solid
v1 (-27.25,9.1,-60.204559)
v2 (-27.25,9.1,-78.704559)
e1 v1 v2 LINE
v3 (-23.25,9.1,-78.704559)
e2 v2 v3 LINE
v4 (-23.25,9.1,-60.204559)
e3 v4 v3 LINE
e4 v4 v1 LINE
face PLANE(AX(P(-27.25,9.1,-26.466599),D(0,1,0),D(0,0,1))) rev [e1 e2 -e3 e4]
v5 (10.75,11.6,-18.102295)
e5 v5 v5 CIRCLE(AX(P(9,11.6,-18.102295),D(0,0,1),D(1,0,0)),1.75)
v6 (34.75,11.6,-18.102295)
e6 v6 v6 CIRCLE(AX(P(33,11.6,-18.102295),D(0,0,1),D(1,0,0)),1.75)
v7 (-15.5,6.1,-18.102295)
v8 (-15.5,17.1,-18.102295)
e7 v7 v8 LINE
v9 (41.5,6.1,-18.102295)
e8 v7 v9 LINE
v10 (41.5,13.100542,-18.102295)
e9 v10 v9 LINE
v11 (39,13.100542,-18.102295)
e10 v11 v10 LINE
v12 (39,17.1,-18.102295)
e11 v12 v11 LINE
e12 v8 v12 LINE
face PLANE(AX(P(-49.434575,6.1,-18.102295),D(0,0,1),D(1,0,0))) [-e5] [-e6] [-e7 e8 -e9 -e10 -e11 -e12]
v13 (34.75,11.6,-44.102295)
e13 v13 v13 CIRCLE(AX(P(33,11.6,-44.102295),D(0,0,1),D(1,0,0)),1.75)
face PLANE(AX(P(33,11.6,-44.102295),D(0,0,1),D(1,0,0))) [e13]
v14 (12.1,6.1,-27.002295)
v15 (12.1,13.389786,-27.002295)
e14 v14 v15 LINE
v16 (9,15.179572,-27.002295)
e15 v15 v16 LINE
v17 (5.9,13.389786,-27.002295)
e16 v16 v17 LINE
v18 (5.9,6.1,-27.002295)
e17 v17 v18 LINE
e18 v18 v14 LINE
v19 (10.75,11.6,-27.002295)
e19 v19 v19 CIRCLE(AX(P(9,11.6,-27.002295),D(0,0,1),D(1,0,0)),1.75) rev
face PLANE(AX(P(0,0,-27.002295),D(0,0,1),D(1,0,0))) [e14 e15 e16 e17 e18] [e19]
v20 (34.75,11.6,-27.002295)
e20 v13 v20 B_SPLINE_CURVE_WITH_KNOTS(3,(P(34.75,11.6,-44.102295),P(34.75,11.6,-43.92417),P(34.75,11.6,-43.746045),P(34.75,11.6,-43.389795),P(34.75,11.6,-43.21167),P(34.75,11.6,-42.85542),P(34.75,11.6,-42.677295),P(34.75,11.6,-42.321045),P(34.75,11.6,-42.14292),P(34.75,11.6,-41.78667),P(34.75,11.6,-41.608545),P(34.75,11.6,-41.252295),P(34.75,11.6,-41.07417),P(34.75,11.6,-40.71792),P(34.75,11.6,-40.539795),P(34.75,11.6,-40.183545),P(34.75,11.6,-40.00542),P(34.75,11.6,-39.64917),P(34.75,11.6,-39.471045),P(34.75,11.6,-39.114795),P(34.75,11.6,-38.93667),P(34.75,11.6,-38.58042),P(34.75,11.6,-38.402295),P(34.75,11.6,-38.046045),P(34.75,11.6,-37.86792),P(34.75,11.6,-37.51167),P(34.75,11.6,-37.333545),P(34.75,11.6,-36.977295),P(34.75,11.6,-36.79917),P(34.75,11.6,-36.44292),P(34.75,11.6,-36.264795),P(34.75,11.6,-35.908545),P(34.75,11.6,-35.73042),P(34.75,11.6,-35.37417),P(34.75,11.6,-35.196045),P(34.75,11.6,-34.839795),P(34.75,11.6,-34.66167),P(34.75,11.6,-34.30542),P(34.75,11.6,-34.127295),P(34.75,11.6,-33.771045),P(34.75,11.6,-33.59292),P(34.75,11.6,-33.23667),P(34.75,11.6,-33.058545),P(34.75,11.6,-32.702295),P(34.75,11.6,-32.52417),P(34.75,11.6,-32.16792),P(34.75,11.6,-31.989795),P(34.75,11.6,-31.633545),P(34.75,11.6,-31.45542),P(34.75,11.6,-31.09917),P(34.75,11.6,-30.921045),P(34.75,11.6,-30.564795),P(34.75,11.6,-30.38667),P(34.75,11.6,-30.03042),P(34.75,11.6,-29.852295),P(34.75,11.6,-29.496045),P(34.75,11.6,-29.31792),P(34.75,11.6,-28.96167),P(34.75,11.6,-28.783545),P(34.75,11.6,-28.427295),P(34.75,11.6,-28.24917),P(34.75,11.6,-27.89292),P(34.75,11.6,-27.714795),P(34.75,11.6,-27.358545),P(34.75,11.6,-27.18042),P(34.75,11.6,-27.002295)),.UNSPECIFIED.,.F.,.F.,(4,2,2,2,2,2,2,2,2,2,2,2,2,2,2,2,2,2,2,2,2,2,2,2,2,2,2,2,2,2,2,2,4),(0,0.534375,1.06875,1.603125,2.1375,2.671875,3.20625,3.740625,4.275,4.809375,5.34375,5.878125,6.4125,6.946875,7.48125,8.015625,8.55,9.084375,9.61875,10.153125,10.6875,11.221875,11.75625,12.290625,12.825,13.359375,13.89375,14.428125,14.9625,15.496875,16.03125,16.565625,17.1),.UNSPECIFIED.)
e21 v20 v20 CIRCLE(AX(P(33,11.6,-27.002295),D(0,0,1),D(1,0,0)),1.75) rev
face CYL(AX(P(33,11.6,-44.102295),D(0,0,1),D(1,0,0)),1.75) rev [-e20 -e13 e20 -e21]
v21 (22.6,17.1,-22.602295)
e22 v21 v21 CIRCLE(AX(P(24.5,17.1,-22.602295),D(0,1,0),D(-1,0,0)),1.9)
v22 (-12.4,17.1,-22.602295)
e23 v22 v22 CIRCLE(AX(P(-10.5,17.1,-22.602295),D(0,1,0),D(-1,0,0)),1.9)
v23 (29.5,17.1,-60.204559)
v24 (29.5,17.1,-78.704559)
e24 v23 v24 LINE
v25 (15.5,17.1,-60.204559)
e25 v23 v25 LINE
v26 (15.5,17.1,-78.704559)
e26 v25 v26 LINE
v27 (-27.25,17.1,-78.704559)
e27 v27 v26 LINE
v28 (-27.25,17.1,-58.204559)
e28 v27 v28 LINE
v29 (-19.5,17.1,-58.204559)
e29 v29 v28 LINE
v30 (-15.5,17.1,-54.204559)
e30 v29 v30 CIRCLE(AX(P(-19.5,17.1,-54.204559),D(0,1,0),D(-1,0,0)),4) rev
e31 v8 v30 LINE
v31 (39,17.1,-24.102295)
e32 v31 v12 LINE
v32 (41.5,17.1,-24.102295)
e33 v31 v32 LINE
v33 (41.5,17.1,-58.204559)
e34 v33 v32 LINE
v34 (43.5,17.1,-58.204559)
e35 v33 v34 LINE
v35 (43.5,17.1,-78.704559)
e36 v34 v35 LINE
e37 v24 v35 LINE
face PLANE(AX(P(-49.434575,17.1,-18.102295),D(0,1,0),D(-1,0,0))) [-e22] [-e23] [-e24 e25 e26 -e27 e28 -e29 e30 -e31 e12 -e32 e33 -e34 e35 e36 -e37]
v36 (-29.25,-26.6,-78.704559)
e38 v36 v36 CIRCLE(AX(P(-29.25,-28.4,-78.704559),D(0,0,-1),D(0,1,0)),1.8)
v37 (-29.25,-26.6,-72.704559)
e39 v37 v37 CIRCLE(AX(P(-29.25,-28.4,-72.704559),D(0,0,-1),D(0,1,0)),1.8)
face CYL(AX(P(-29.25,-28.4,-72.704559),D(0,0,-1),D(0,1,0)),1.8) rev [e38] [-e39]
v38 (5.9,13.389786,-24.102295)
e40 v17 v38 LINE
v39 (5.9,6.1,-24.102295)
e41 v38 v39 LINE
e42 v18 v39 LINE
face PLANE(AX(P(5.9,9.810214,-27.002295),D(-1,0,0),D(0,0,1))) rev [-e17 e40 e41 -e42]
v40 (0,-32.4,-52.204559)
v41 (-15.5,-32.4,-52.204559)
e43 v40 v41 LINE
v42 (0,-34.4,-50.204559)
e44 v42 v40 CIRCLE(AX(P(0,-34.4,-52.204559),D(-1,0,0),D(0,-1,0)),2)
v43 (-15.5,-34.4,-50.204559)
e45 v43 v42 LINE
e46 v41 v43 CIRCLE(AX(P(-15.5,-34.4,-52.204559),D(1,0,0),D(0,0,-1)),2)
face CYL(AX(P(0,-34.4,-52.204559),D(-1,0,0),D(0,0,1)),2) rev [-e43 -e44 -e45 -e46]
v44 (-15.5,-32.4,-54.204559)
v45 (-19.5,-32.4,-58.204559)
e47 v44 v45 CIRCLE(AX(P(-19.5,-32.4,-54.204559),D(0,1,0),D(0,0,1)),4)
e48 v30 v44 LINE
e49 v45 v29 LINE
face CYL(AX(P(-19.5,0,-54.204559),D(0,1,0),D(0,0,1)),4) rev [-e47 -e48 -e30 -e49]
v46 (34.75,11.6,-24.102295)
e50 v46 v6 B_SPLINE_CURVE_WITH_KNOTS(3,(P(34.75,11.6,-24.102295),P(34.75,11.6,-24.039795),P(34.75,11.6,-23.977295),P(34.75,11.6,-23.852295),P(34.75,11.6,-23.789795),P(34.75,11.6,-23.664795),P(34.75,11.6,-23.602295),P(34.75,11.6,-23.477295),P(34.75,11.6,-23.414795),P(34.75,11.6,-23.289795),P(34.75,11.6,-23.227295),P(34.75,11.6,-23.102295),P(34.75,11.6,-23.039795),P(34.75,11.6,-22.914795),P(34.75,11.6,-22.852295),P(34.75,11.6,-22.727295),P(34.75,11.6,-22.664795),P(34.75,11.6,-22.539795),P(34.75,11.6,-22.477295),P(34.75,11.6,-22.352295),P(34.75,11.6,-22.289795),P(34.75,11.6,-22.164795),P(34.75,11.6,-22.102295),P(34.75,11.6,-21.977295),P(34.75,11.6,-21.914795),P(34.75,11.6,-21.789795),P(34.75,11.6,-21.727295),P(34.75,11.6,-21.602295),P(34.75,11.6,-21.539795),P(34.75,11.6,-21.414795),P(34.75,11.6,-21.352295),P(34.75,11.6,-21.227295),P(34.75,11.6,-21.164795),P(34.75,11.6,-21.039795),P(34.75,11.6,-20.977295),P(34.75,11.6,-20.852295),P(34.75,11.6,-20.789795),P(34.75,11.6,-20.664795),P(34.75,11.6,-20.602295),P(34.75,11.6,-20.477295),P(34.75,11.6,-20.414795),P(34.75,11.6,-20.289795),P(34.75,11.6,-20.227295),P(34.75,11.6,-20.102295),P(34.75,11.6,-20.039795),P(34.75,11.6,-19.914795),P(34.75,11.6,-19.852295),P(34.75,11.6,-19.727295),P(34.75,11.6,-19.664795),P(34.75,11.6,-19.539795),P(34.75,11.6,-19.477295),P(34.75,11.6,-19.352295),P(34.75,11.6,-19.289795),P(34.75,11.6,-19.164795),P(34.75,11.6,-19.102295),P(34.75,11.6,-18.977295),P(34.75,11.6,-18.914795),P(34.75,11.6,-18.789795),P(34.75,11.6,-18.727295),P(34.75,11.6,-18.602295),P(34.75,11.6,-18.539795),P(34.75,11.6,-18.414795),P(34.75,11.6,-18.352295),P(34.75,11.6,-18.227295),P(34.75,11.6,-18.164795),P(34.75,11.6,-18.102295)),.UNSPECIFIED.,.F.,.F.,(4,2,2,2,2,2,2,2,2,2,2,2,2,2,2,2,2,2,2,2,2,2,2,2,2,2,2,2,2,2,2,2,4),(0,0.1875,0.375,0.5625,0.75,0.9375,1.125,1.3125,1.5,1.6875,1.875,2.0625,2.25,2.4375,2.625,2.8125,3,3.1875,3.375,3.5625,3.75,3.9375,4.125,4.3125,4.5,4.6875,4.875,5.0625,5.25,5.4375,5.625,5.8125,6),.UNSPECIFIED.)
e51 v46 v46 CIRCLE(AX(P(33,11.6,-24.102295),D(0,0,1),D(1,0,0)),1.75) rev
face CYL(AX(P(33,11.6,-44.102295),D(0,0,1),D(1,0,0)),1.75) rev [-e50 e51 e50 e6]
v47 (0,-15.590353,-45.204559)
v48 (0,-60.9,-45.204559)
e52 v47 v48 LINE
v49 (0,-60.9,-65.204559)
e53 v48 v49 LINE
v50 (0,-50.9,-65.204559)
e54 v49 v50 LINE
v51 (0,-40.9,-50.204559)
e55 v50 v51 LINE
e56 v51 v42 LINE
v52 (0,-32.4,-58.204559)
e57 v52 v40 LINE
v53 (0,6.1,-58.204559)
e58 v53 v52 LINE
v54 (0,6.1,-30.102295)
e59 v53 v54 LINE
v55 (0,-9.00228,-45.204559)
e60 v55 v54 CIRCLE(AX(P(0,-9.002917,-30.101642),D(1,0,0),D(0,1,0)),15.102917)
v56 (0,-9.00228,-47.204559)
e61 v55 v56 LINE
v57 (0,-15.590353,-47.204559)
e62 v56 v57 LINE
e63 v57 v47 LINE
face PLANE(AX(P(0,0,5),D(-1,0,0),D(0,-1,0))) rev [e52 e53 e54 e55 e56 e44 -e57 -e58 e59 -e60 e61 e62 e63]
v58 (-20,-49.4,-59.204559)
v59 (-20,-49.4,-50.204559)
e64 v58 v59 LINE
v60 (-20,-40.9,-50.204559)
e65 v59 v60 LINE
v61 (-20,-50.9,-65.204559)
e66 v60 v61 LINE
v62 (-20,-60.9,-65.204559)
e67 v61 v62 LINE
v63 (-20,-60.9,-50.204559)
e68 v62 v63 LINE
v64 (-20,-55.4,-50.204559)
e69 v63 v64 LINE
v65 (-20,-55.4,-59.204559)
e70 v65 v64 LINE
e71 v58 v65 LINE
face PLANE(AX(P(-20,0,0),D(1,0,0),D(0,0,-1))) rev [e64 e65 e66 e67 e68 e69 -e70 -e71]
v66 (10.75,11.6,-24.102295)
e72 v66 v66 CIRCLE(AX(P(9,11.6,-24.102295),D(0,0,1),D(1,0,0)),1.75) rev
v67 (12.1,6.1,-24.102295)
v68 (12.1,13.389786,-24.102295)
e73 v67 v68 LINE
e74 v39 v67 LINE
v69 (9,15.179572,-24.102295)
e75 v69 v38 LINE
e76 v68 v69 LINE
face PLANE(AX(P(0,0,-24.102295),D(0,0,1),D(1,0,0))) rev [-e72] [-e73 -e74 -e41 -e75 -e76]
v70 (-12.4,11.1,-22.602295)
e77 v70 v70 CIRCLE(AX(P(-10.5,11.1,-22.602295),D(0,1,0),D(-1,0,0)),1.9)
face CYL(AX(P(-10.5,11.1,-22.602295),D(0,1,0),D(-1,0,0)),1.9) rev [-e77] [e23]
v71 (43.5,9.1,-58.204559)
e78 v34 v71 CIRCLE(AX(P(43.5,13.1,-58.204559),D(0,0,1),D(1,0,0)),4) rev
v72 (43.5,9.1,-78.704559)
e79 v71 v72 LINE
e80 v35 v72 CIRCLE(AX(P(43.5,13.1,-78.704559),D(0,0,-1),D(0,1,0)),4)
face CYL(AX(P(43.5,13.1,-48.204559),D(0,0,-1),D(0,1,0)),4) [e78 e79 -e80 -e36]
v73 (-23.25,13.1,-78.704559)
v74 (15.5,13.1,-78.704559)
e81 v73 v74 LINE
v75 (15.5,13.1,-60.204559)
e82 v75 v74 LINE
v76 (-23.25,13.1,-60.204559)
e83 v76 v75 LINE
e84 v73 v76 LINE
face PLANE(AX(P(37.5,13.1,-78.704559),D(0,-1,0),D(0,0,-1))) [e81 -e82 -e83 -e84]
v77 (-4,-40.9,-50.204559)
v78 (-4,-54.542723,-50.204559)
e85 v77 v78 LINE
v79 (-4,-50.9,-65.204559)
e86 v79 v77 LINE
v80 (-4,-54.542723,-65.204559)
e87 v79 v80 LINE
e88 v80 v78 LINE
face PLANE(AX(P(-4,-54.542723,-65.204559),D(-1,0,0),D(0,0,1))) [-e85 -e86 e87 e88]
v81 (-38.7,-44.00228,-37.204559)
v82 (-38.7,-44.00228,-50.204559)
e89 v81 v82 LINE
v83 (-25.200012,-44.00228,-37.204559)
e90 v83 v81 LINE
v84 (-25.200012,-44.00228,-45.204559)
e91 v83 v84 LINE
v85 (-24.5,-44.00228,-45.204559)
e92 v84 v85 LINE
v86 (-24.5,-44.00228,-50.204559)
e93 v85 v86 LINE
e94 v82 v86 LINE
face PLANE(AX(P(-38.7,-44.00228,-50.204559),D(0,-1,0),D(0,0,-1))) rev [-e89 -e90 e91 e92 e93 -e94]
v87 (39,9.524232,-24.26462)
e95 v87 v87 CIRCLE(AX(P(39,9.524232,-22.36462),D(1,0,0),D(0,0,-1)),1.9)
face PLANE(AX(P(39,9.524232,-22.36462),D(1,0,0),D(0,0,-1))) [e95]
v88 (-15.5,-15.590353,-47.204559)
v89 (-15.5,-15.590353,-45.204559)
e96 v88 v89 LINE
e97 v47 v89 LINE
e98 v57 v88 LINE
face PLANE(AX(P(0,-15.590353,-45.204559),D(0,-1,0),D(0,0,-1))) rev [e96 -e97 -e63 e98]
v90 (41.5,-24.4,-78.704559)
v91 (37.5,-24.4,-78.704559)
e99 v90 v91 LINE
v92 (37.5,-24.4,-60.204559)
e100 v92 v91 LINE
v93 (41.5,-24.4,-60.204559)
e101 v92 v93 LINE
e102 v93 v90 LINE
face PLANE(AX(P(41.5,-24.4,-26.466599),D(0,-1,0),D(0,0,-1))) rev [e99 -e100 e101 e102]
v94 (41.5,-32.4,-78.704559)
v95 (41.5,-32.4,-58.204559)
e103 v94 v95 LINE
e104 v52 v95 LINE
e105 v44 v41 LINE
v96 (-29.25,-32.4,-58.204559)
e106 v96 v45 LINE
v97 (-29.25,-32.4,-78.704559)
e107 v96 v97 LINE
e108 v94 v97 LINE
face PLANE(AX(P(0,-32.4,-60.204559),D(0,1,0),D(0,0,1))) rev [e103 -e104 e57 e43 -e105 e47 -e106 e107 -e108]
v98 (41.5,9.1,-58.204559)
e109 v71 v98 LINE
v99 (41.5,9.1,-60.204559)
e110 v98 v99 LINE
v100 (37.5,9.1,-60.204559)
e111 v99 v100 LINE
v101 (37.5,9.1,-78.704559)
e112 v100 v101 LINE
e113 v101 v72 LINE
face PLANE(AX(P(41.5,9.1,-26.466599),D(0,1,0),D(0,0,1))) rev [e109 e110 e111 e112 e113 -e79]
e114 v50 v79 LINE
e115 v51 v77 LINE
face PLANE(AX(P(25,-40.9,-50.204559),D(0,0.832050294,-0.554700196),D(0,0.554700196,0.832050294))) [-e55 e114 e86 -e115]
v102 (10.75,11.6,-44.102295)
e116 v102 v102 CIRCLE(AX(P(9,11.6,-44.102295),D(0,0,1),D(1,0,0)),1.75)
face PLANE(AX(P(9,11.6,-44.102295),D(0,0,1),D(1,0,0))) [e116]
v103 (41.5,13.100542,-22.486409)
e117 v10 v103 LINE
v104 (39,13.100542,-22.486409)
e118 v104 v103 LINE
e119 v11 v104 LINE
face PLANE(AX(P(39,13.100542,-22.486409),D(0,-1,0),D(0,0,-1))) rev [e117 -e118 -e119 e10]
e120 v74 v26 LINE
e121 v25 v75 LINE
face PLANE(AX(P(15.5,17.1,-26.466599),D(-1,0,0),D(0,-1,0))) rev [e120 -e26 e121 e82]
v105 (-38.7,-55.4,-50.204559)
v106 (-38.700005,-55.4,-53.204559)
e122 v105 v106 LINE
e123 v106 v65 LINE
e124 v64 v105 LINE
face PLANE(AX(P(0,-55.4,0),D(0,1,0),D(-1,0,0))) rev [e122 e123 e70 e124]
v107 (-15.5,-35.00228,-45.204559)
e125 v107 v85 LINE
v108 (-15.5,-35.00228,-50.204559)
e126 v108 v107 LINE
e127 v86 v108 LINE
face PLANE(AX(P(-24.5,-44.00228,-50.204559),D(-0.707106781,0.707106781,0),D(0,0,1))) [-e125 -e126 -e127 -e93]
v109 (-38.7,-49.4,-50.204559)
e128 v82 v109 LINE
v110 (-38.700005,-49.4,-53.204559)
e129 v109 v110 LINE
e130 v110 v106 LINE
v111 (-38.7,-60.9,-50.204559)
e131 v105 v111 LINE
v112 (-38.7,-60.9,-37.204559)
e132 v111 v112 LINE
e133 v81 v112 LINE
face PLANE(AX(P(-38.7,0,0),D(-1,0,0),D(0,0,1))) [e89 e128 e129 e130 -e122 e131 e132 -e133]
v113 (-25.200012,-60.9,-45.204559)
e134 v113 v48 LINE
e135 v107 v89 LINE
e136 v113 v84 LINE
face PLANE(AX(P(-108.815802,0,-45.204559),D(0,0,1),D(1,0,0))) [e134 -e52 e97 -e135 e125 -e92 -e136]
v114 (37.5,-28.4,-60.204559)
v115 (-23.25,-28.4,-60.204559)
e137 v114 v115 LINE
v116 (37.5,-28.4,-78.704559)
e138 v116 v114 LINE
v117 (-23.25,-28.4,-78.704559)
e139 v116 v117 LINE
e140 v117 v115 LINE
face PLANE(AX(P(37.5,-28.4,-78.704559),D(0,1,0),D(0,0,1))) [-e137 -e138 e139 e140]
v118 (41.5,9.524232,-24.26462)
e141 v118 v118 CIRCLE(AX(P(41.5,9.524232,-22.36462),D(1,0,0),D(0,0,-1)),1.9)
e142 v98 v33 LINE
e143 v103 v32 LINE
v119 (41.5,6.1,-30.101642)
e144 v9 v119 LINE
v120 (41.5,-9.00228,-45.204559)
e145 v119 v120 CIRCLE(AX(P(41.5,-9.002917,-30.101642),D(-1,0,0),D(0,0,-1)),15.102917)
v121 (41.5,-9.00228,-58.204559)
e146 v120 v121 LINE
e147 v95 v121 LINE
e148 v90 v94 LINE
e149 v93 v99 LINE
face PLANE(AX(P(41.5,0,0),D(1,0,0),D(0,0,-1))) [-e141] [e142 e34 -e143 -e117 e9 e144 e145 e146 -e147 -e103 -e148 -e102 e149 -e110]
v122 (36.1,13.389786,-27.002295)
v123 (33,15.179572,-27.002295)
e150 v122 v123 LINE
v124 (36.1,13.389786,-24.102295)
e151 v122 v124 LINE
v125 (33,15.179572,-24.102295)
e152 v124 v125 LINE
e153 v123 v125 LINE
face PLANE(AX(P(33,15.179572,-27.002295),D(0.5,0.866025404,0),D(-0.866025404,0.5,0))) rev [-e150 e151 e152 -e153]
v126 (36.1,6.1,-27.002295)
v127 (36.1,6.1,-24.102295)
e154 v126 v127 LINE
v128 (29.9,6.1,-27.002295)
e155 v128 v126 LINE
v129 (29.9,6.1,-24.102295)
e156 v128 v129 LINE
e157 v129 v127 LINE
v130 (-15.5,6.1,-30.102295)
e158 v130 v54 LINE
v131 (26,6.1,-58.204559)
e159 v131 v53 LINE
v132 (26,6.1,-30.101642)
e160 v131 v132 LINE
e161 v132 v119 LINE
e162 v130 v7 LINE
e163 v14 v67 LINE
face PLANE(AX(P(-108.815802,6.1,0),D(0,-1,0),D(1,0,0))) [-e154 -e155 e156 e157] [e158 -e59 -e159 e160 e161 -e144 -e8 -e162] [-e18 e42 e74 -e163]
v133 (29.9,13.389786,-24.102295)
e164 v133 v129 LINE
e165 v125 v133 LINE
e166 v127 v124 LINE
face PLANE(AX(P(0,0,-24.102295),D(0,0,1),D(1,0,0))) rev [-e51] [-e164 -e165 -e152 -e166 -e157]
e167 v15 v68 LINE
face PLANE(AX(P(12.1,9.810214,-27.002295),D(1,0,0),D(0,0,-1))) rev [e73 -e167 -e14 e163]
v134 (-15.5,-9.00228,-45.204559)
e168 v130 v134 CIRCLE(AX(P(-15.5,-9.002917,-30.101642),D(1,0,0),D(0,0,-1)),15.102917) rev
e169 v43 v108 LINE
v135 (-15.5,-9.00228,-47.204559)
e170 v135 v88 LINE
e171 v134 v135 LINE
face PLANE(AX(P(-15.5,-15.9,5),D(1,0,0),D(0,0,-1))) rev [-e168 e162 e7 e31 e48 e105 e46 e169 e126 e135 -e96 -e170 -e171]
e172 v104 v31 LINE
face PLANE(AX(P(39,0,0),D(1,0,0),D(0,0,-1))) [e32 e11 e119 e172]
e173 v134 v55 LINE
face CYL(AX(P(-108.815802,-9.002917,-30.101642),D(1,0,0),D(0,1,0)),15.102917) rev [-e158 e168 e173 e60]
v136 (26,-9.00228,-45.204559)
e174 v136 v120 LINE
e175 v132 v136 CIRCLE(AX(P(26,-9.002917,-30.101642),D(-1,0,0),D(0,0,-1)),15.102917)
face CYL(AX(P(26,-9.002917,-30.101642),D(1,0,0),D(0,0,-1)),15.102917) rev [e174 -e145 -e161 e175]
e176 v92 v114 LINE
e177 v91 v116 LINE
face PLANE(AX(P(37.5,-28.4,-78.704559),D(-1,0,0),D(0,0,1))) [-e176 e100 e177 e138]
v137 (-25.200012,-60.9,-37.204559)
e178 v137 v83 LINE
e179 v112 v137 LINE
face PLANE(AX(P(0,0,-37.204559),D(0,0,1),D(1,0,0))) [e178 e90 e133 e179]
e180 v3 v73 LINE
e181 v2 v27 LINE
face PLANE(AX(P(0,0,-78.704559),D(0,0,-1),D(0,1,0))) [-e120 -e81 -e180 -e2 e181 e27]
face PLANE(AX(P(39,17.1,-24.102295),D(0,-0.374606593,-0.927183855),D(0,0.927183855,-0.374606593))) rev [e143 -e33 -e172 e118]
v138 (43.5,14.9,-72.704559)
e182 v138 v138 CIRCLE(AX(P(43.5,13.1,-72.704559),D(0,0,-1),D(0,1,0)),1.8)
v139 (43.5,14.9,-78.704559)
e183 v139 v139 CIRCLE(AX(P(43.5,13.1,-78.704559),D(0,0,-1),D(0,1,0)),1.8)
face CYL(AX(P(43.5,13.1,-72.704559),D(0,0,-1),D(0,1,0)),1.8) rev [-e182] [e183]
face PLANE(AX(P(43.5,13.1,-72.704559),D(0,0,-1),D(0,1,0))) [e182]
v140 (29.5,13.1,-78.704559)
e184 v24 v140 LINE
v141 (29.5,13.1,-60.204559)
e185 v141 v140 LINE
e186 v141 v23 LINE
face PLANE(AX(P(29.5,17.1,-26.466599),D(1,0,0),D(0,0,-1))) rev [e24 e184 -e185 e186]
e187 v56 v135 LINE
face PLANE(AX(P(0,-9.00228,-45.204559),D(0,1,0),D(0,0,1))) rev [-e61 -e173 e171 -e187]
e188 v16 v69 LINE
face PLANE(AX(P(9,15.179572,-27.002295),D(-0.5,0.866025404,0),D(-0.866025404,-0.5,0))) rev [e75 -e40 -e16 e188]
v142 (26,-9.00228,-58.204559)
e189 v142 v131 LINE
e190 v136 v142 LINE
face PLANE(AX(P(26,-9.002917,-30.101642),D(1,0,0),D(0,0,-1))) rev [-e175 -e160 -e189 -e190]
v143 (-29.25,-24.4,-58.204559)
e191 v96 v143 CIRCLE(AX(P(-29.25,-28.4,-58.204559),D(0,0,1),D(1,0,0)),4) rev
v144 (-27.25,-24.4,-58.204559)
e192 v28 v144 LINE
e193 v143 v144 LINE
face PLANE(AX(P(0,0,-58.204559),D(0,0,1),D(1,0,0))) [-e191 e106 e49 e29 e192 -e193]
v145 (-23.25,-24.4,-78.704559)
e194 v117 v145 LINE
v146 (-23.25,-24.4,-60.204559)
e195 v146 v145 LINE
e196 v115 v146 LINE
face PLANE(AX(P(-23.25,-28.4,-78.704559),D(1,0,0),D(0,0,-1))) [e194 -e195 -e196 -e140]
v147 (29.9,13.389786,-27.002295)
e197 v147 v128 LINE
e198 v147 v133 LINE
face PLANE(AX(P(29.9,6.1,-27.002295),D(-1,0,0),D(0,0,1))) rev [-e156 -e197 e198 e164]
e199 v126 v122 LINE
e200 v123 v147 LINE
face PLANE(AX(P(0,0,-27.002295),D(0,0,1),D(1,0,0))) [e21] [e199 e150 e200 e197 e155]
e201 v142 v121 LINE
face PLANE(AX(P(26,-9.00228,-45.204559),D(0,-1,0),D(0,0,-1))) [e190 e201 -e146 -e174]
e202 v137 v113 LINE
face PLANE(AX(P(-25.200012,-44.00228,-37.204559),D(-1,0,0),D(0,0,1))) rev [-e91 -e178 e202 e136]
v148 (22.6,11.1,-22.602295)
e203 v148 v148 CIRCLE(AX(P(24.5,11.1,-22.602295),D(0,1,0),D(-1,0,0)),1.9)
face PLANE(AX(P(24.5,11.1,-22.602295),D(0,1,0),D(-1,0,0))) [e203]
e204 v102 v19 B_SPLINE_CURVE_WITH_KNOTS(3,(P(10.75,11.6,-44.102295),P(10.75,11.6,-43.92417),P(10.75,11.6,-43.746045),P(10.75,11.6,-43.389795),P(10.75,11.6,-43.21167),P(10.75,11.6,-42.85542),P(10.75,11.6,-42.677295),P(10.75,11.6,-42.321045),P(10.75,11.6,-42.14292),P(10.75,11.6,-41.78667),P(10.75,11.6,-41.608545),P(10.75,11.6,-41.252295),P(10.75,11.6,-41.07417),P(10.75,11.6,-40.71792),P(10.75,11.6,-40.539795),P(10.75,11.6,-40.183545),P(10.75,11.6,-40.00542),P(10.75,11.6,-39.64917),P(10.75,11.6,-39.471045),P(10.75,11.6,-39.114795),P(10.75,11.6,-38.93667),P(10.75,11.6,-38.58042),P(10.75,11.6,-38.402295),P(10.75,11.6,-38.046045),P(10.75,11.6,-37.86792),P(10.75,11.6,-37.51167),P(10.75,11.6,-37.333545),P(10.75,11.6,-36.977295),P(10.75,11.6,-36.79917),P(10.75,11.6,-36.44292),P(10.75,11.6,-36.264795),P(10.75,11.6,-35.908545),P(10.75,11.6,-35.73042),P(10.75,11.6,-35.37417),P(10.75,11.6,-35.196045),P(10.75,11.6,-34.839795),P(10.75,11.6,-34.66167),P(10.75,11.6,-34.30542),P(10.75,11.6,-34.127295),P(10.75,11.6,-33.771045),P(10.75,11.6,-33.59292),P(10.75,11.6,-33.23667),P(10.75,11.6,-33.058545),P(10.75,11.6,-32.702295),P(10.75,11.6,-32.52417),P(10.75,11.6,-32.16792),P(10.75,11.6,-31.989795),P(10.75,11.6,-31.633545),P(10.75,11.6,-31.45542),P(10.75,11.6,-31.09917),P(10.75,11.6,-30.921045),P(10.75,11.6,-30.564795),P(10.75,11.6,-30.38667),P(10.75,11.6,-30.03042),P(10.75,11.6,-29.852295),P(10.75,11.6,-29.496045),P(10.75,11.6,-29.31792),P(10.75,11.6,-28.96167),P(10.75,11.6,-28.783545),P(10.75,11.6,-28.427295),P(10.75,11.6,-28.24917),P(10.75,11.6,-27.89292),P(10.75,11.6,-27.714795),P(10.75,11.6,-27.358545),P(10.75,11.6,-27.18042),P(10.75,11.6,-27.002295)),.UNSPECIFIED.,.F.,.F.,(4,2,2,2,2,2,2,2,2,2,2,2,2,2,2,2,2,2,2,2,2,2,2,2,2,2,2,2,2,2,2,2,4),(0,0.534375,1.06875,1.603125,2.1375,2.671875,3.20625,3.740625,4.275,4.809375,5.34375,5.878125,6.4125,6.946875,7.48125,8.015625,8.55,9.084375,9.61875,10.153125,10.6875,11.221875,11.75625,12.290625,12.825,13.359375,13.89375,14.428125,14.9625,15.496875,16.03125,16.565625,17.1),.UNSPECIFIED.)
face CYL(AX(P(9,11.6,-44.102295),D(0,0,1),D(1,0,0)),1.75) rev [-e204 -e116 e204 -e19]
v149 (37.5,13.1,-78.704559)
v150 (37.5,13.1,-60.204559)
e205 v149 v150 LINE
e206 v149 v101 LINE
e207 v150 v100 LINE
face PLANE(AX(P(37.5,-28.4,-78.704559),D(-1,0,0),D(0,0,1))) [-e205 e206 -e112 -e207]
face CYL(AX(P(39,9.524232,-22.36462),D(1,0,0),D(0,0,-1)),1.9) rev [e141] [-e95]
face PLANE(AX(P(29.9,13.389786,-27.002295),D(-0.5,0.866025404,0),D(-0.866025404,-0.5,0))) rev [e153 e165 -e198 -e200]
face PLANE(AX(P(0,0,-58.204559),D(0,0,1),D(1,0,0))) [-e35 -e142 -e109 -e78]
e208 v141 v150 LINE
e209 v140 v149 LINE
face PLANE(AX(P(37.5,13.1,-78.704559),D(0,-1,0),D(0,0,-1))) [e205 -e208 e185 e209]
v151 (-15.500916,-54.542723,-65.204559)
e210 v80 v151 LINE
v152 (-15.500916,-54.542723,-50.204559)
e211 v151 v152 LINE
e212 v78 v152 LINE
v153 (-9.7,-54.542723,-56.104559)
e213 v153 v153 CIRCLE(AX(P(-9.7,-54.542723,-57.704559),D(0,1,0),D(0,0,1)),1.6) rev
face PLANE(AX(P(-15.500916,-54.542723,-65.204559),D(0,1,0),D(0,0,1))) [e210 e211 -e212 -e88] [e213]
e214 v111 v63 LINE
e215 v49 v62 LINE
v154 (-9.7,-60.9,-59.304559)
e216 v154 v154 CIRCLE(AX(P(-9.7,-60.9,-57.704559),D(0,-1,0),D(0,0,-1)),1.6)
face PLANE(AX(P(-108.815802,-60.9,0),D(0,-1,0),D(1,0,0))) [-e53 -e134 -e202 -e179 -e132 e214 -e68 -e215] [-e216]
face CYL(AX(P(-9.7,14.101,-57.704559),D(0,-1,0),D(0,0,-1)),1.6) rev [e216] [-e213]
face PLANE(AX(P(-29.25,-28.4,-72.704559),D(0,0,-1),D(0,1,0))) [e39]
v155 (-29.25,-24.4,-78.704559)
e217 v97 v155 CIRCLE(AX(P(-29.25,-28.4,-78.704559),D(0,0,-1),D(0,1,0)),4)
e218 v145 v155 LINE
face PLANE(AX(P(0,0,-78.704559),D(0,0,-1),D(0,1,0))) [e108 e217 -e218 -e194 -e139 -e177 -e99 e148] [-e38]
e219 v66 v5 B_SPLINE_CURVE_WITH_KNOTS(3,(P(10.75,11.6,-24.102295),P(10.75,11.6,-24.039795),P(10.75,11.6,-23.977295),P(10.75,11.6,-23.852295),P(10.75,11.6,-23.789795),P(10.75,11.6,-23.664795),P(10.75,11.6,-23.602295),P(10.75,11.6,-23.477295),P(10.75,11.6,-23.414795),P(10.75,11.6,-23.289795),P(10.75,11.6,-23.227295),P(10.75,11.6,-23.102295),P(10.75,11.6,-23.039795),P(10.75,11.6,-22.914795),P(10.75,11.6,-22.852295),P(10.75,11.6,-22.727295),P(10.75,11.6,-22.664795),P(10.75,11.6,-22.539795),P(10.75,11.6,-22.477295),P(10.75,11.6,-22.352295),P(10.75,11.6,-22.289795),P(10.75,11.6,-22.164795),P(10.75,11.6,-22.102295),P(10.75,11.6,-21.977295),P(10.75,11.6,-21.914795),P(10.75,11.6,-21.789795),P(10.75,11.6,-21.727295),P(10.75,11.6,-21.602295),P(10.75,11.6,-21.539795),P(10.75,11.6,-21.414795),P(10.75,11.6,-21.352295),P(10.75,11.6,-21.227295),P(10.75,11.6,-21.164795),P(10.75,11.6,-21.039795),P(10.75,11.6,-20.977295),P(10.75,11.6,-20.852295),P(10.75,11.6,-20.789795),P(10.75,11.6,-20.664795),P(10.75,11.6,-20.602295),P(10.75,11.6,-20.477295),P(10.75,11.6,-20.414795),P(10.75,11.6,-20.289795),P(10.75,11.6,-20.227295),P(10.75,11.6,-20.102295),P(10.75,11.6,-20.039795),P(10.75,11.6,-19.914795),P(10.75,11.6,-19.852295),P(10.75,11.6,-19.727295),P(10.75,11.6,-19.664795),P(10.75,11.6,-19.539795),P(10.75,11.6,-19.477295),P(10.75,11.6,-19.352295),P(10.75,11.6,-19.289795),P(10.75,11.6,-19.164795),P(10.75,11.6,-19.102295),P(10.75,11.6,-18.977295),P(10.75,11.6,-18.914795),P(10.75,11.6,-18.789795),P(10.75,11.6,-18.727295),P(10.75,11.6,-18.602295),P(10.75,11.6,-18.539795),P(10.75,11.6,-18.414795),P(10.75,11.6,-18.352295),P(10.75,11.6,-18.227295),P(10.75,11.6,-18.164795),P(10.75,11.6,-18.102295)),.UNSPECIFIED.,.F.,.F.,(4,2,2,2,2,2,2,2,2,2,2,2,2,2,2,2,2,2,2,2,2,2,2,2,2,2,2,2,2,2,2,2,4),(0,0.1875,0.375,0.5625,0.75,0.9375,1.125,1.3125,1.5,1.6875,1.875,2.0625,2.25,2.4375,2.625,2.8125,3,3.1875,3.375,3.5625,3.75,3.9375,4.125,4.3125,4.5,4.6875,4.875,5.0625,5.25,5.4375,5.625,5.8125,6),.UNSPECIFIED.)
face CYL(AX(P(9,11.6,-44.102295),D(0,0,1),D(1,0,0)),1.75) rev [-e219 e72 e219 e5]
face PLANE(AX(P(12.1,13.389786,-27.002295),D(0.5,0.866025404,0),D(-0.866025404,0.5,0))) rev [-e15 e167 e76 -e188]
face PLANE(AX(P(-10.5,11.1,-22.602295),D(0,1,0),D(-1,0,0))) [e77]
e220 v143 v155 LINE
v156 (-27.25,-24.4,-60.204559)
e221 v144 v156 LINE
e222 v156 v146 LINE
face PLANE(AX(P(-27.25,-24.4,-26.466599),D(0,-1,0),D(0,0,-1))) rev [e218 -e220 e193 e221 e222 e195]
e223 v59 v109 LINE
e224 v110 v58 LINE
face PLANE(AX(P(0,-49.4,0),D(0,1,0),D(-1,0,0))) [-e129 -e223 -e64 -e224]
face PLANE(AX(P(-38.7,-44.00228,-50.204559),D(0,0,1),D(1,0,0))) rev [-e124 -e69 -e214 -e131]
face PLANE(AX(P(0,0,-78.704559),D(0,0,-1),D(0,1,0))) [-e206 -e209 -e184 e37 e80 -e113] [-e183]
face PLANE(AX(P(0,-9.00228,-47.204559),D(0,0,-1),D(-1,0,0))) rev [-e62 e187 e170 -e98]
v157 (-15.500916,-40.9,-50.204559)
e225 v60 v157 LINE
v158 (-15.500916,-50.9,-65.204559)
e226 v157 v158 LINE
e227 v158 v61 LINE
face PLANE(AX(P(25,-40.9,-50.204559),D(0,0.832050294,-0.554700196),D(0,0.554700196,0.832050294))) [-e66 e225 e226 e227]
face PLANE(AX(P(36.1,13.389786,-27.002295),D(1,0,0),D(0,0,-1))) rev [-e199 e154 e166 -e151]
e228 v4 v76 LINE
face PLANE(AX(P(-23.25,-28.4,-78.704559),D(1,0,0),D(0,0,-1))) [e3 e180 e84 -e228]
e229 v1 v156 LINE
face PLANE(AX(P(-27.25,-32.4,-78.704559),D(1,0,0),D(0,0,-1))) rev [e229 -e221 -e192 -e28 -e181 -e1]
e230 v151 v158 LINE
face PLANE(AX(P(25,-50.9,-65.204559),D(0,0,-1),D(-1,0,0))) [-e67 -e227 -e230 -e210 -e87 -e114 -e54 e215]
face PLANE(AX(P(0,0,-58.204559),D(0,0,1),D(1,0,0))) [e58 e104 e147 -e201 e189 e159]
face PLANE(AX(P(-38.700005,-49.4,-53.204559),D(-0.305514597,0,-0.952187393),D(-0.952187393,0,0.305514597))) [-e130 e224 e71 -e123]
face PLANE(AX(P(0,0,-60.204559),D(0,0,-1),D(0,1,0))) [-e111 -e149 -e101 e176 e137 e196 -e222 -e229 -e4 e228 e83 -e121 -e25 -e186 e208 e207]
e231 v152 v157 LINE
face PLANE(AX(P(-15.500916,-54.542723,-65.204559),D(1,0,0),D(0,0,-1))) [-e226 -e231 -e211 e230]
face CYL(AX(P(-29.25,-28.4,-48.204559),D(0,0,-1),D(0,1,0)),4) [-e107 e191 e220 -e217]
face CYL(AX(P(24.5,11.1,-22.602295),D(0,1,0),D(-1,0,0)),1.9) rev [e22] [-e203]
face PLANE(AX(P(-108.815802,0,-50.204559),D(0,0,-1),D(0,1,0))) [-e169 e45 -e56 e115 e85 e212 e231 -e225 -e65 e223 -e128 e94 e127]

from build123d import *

# Parameters (mm, degrees)
RESSALTO_EXTRUS_O1_DEPTH  = 5
RESSALTO_EXTRUS_O2_DEPTH  = 15.5
RESSALTO_EXTRUS_O3_DEPTH  = 15.5
RESSALTO_EXTRUS_O4_DEPTH  = 20
ESBO_O6_W                 = 5
ESBO_O6_H                 = 16.897720337
RESSALTO_EXTRUS_O5_DEPTH  = 23.2
ESBO_O7_W                 = 13.499987793
ESBO_O7_H                 = 16.897720337
RESSALTO_EXTRUS_O6_DEPTH  = 8
ESBO_O8_W                 = 2.000000014
ESBO_O8_H                 = 6.588073731
CORTE_EXTRUS_O1_DEPTH     = 93.188310305
CHANFRO2_SIZE             = 9
RESSALTO_EXTRUS_O8_DEPTH  = 4.5
RESSALTO_EXTRUS_O7_START  = -5.5
RESSALTO_EXTRUS_O7_DEPTH  = 6
CORTE_EXTRUS_O2_REACH     = 102.674
ESBO_O11_W                = 11.999984741
ESBO_O11_H                = 13.640792847
CORTE_EXTRUS_O4_REACH     = 108.65
ESBO_O13_R                = 1.6
RESSALTO_EXTRUS_O9_DEPTH  = 5
ESBO_O16_W                = 11.500915527
ESBO_O16_H                = 13.642723083
CORTE_EXTRUS_O5_DEPTH     = 101.673633611
RESSALTO_EXTRUS_O13_START = -15.5
ESBO_O18_W                = 32.102264404
ESBO_O18_H                = 11
RESSALTO_EXTRUS_O13_DEPTH = 77.5
ESBO_O27_W                = 32.102264404
ESBO_O27_H                = 11
CORTE_EXTRUS_O8_DEPTH     = 20.5
ESBO_O29_R                = 1.9
CORTE_EXTRUS_O9_DEPTH     = 2.5
ESBO_O30_R                = 1.9
CORTE_EXTRUS_O10_DEPTH    = 6
ESBO_O32_W                = 20
ESBO_O32_H                = 78
CORTE_EXTRUS_O11_DEPTH    = 88.462468019
ESBO_O33_R                = 1.75
CORTE_EXTRUS_O12_DEPTH    = 26
CORTE_EXTRUS_O13_START    = -6
CORTE_EXTRUS_O13_DEPTH    = 2.9
RESSALTO_EXTRUS_O20_DEPTH = 10
ESBO_O40_W                = 68.75
ESBO_O40_H                = 49.5
ESBO_O40_W_2              = 60.75
ESBO_O40_H_2              = 41.5
RESSALTO_EXTRUS_O21_DEPTH = 18.5
ESBO_O41_W                = 11.75
ESBO_O41_H                = 49.5
ESBO_O41_W_2              = 41.5
ESBO_O41_H_2              = 38.5
RESSALTO_EXTRUS_O22_DEPTH = 2
RESSALTO_EXTRUS_O23_DEPTH = 15.5
ESBO_O43_W                = 4
ESBO_O43_H                = 33.5
ESBO_O43_W_2              = 14
ESBO_O43_H_2              = 4
CORTE_EXTRUS_O14_DEPTH    = 18.5
RESSALTO_EXTRUS_O24_DEPTH = 20.5
ESBO_O45_R                = 1.8
CORTE_EXTRUS_O15_DEPTH    = 6
FILETE1_R                 = 4
FILETE2_R                 = 2


with BuildPart() as part:
    # Esboço2 → Ressalto-extrusão1 (new body)
    with BuildSketch(Plane.XY):
        Polygon((0, 0), (0, -60.9), (-20, -60.9), (-20, -25.9), (-15.5, -15.9), (-15.5, 0), align=None)
    extrude(amount=RESSALTO_EXTRUS_O1_DEPTH)

    # Esboço3 → Ressalto-extrusão2 (add)
    with BuildSketch(Plane(origin=(0, 0, 0), x_dir=(0, 0, -1), z_dir=(1, 0, 0))):
        with BuildLine():
            ThreePointArc((6.102294922, 14.1), (-2.871049482, 9.744626932), (-5, 0))
            Line((-5, 0), (0, 0))
            ThreePointArc((0, 0), (1.788130128, 4.313492501), (6.102294922, 6.1))
            Line((6.102294922, 6.1), (30.102294922, 6.1))
            ThreePointArc((30.102294922, 6.099999986), (40.781022689, 1.676452573), (45.204559313, -9.002279663))
            Line((45.204559326, -9.002279663), (45.204559326, -60.9))
            Line((45.204559326, -60.9), (50.204559326, -60.9))
            Line((50.204559326, -60.9), (50.204559326, 14.1))
            Line((50.204559326, 14.1), (6.102294922, 14.1))
        make_face()
    extrude(amount=-RESSALTO_EXTRUS_O2_DEPTH)

    # Esboço4 → Ressalto-extrusão3 (add)
    with BuildSketch(Plane.ZY.offset(15.5)):
        Polygon((-50.204559326, -60.9), (-50.204559326, -40.9), (-65.204559326, -50.9), (-65.204559326, -60.9), align=None)
    extrude(amount=-RESSALTO_EXTRUS_O3_DEPTH)

    # Esboço5 → Ressalto-extrusão4 (add)
    with BuildSketch(Plane.ZY.offset(20)):
        Polygon((5, -60.9), (20, -60.9), (20, -50.9), (5, -40.9), align=None)
    extrude(amount=-RESSALTO_EXTRUS_O4_DEPTH)

    # Esboço6 → Ressalto-extrusão5 (add)
    with BuildSketch(Plane.ZY.offset(15.5)):
        with Locations((-47.704559326, -52.451139832)):
            Rectangle(ESBO_O6_W, ESBO_O6_H)
    extrude(amount=RESSALTO_EXTRUS_O5_DEPTH)

    # Esboço7 → Ressalto-extrusão6 (add)
    with BuildSketch(Plane.XY.offset(-45.204559326)):
        with Locations((-31.950006104, -52.451139832)):
            Rectangle(ESBO_O7_W, ESBO_O7_H)
    extrude(amount=RESSALTO_EXTRUS_O6_DEPTH)

    # Esboço8 → Corte-extrusão1 (cut, through all)
    with BuildSketch(Plane.ZY.offset(15.5)):
        with Locations((-46.204559319, -12.296316529)):
            Rectangle(ESBO_O8_W, ESBO_O8_H)
    extrude(amount=-CORTE_EXTRUS_O1_DEPTH, mode=Mode.SUBTRACT)

    # Chanfro2
    # the kernel refuses this chamfer: 9 mm, written as the material it adds along each edge
    with BuildSketch(Plane(origin=(-15.5, -44.002279663, -50.204559326), x_dir=(0.027495876610586407, 0.9996219169112969, 0), z_dir=(0, 0, 1))) as chanfro2_piece_1:
        Polygon((CHANFRO2_SIZE * 0.999621916911, CHANFRO2_SIZE * 0.0274958766106), (-CHANFRO2_SIZE * 0.0274958766106, CHANFRO2_SIZE * 0.999621916911), (0, 0), align=None)
    extrude(amount=5)

    # Esboço10 → Ressalto-extrusão8 (add)
    with BuildSketch(Plane.ZY.offset(15.5)):
        Polygon((-50.204559326, -40.9), (-50.204559326, -60.9), (-65.204559326, -60.9), (-65.204559326, -50.9), align=None)
    extrude(amount=RESSALTO_EXTRUS_O8_DEPTH)

    # Esboço9 → Ressalto-extrusão7 (add)
    with BuildSketch(Plane.XZ.offset(60.9).offset(RESSALTO_EXTRUS_O7_START)):
        Polygon((-38.7, -50.204559326), (-38.700004578, -53.204559326), (-20, -59.204559326), (-20, -50.204559326), align=None)
    extrude(amount=-RESSALTO_EXTRUS_O7_DEPTH)

    # Corte-extrusão2: up to this face of the body (flat: up to its plane)
    corte_extrus_o2_end = Plane(part.part.faces().sort_by_distance((-10, -45.9, 12.5))[0])
    # Esboço11 → Corte-extrusão2 (cut, up to the picked face)
    with BuildSketch(Plane.XY.offset(5), mode=Mode.PRIVATE) as corte_extrus_o2_sk1:
        with Locations((-10.00000763, -47.720396424)):
            Rectangle(ESBO_O11_W, ESBO_O11_H)
    corte_extrus_o2_tool1 = split(extrude(corte_extrus_o2_sk1.sketch, amount=CORTE_EXTRUS_O2_REACH, mode=Mode.PRIVATE), bisect_by=corte_extrus_o2_end, keep=Keep.BOTH, mode=Mode.PRIVATE)
    add(corte_extrus_o2_tool1.solids().sort_by(Axis((-10.000008, -47.720396, 5), (0, 0, 1)))[0], mode=Mode.SUBTRACT)

    # Esboço13 → Corte-extrusão4 (cut, up to next)
    with BuildSketch(Plane.XZ.offset(60.9), mode=Mode.PRIVATE) as corte_extrus_o4_sk1:
        with Locations(Location((-10, 12.5, 0), (0, 0, 270))):
            Circle(ESBO_O13_R)
    corte_extrus_o4_tool1 = extrude(corte_extrus_o4_sk1.sketch, amount=-CORTE_EXTRUS_O4_REACH, mode=Mode.PRIVATE) & part.part
    # Esboço13 → Corte-extrusão4 (cut, up to next)
    with BuildSketch(Plane.XZ.offset(60.9), mode=Mode.PRIVATE) as corte_extrus_o4_sk2:
        with Locations(Location((-9.7, -57.704559326, 0), (0, 0, 270))):
            Circle(ESBO_O13_R)
    corte_extrus_o4_tool2 = extrude(corte_extrus_o4_sk2.sketch, amount=-CORTE_EXTRUS_O4_REACH, mode=Mode.PRIVATE) & part.part
    add(corte_extrus_o4_tool1.solids().sort_by_distance((-10, -60.9, 12.5))[0], mode=Mode.SUBTRACT)
    add(corte_extrus_o4_tool2.solids().sort_by_distance((-9.7, -60.9, -57.704559))[0], mode=Mode.SUBTRACT)

    # Esboço14 → Ressalto-extrusão9 (add)
    with BuildSketch(Plane.XY.offset(5)):
        Polygon((-10.75, 0), (-4.75, 0), (-4.75, -15.9), (-7.000007629, -25.9), (-7.000007629, -40.9), (-13.000007629, -40.9), (-13.000007629, -25.9), (-10.75, -15.9), align=None)
    extrude(amount=RESSALTO_EXTRUS_O9_DEPTH)

    # Esboço16 → Corte-extrusão5 (cut, through all)
    with BuildSketch(Plane(origin=(0, 0, -50.204559326), x_dir=(-1, 0, 0), z_dir=(0, 0, -1))):
        with Locations((9.750457764, -47.721361542)):
            Rectangle(ESBO_O16_W, ESBO_O16_H)
    extrude(amount=CORTE_EXTRUS_O5_DEPTH, mode=Mode.SUBTRACT)

    # Esboço18 → Ressalto-extrusão13 (add)
    with BuildSketch(Plane(origin=(0, 0, 0), x_dir=(0, 0, -1), z_dir=(1, 0, 0)).offset(RESSALTO_EXTRUS_O13_START)):
        with Locations((34.153427124, 11.6)):
            Rectangle(ESBO_O18_W, ESBO_O18_H)
    extrude(amount=RESSALTO_EXTRUS_O13_DEPTH)

    # Esboço27 → Corte-extrusão8 (cut)
    with BuildSketch(Plane(origin=(62, 0, 0), x_dir=(0, 0, -1), z_dir=(1, 0, 0))):
        with Locations((34.153427124, 11.6)):
            Rectangle(ESBO_O27_W, ESBO_O27_H)
    extrude(amount=-CORTE_EXTRUS_O8_DEPTH, mode=Mode.SUBTRACT)

    # Esboço29 → Corte-extrusão9 (cut)
    with BuildSketch(Plane(origin=(41.5, 0, 0), x_dir=(0, 0, -1), z_dir=(1, 0, 0))):
        with Locations((22.364620491, 9.524231873)):
            Circle(ESBO_O29_R)
        Polygon((24.102294922, 17.1), (22.486408956, 13.10054189), (18.102294922, 13.10054189), (18.102294922, 17.1), align=None)
    extrude(amount=-CORTE_EXTRUS_O9_DEPTH, mode=Mode.SUBTRACT)

    # Esboço30 → Corte-extrusão10 (cut)
    with BuildSketch(Plane(origin=(0, 17.1, 0), x_dir=(1, 0, 0), z_dir=(0, 1, 0))):
        with Locations(Location((-10.5, 22.602294922, 0), (0, 0, 180))):
            Circle(ESBO_O30_R)
        with Locations(Location((24.5, 22.602294922, 0), (0, 0, 180))):
            Circle(ESBO_O30_R)
    extrude(amount=-CORTE_EXTRUS_O10_DEPTH, mode=Mode.SUBTRACT)

    # Esboço32 → Corte-extrusão11 (cut, through all)
    with BuildSketch(Plane.XY.offset(-18.102294922)):
        with Locations((-10, -21.9)):
            Rectangle(ESBO_O32_W, ESBO_O32_H)
    extrude(amount=CORTE_EXTRUS_O11_DEPTH, mode=Mode.SUBTRACT)

    # Esboço33 → Corte-extrusão12 (cut)
    with BuildSketch(Plane.XY.offset(-18.102294922)):
        with Locations((9, 11.6)):
            Circle(ESBO_O33_R)
        with Locations((33, 11.6)):
            Circle(ESBO_O33_R)
    extrude(amount=-CORTE_EXTRUS_O12_DEPTH, mode=Mode.SUBTRACT)

    # Esboço34 → Corte-extrusão13 (cut)
    with BuildSketch(Plane.XY.offset(-18.102294922).offset(CORTE_EXTRUS_O13_START)):
        Polygon((9, 15.179571669), (5.9, 13.389785834), (5.9, 9.810214166), (5.9, 6.1), (12.1, 6.1), (12.1, 9.810214166), (12.1, 13.389785834), align=None)
        Polygon((29.9, 6.1), (29.9, 9.810214166), (29.9, 13.389785834), (33, 15.179571669), (36.1, 13.389785834), (36.1, 9.810214166), (36.1, 6.1), align=None)
    extrude(amount=-CORTE_EXTRUS_O13_DEPTH, mode=Mode.SUBTRACT)

    # Esboço39 → Ressalto-extrusão20 (add)
    with BuildSketch(Plane(origin=(0, 0, -50.204559326), x_dir=(-1, 0, 0), z_dir=(0, 0, -1))):
        Polygon((-41.5, 17.1), (-41.5, 6.1), (0, 6.1), (0, -32.4), (15.5, -32.4), (15.5, 17.1), align=None)
    extrude(amount=RESSALTO_EXTRUS_O20_DEPTH)

    # Esboço40 → Ressalto-extrusão21 (add)
    with BuildSketch(Plane(origin=(0, 0, -60.204559326), x_dir=(-1, 0, 0), z_dir=(0, 0, -1))):
        with Locations((-7.125, -7.65)):
            Rectangle(ESBO_O40_W, ESBO_O40_H)
        with Locations((-7.125, -7.65)):
            Rectangle(ESBO_O40_W_2, ESBO_O40_H_2, mode=Mode.SUBTRACT)
    extrude(amount=RESSALTO_EXTRUS_O21_DEPTH)

    # Esboço41 → Ressalto-extrusão22 (add)
    with BuildSketch(Plane.XY.offset(-60.204559326)):
        with Locations((-21.375, -7.65)):
            Rectangle(ESBO_O41_W, ESBO_O41_H)
        with Locations((20.75, -13.15)):
            Rectangle(ESBO_O41_W_2, ESBO_O41_H_2)
    extrude(amount=RESSALTO_EXTRUS_O22_DEPTH)

    # Esboço42 → Ressalto-extrusão23 (add)
    with BuildSketch(Plane(origin=(41.5, 0, 0), x_dir=(0, 0, -1), z_dir=(1, 0, 0))):
        with BuildLine():
            Line((45.204559312, -9.002279663), (58.204559326, -9.002279663))
            Line((58.204559326, -9.002279663), (58.204559326, 6.1))
            Line((58.204559326, 6.1), (30.101642126, 6.1))
            ThreePointArc((30.101642126, 6.1), (40.780791888, 1.676683369), (45.204559312, -9.002279663))
        make_face()
    extrude(amount=-RESSALTO_EXTRUS_O23_DEPTH)

    # Esboço43 → Corte-extrusão14 (cut)
    with BuildSketch(Plane(origin=(0, 0, -78.704559326), x_dir=(-1, 0, 0), z_dir=(0, 0, -1))):
        with Locations((-39.5, -7.65)):
            Rectangle(ESBO_O43_W, ESBO_O43_H)
        with Locations((25.25, -7.65)):
            Rectangle(ESBO_O43_W, ESBO_O43_H)
        with Locations((-22.5, 15.1)):
            Rectangle(ESBO_O43_W_2, ESBO_O43_H_2)
    extrude(amount=-CORTE_EXTRUS_O14_DEPTH, mode=Mode.SUBTRACT)

    # Esboço44 → Ressalto-extrusão24 (add)
    with BuildSketch(Plane(origin=(0, 0, -78.704559326), x_dir=(-1, 0, 0), z_dir=(0, 0, -1))):
        with BuildLine():
            Line((-43.5, 17.1), (-41.5, 17.1))
            Line((-41.5, 17.1), (-41.5, 9.1))
            Line((-41.5, 9.1), (-43.5, 9.1))
            ThreePointArc((-43.5, 9.1), (-47.5, 13.1), (-43.5, 17.1))
        make_face()
        with BuildLine():
            Line((29.25, -24.4), (27.25, -24.4))
            Line((27.25, -24.4), (27.25, -32.4))
            Line((27.25, -32.4), (29.25, -32.4))
            ThreePointArc((29.25, -32.4), (33.25, -28.4), (29.25, -24.4))
        make_face()
    extrude(amount=-RESSALTO_EXTRUS_O24_DEPTH)

    # Esboço45 → Corte-extrusão15 (cut)
    with BuildSketch(Plane(origin=(0, 0, -78.704559326), x_dir=(-1, 0, 0), z_dir=(0, 0, -1))):
        with Locations(Location((-43.5, 13.1, 0), (0, 0, 90))):
            Circle(ESBO_O45_R)
        with Locations(Location((29.25, -28.4, 0), (0, 0, 90))):
            Circle(ESBO_O45_R)
    extrude(amount=-CORTE_EXTRUS_O15_DEPTH, mode=Mode.SUBTRACT)

    # Filete1
    filete1_edges = [part.edges().sort_by_distance(p)[0] for p in [
        (-15.5, -7.65, -58.204559326),
    ]]
    fillet(filete1_edges, radius=FILETE1_R)

    # Filete2
    filete2_edges = [part.edges().sort_by_distance(p)[0] for p in [
        (-7.75, -32.4, -50.204559326),
    ]]
    fillet(filete2_edges, radius=FILETE2_R)


solid = part.part
